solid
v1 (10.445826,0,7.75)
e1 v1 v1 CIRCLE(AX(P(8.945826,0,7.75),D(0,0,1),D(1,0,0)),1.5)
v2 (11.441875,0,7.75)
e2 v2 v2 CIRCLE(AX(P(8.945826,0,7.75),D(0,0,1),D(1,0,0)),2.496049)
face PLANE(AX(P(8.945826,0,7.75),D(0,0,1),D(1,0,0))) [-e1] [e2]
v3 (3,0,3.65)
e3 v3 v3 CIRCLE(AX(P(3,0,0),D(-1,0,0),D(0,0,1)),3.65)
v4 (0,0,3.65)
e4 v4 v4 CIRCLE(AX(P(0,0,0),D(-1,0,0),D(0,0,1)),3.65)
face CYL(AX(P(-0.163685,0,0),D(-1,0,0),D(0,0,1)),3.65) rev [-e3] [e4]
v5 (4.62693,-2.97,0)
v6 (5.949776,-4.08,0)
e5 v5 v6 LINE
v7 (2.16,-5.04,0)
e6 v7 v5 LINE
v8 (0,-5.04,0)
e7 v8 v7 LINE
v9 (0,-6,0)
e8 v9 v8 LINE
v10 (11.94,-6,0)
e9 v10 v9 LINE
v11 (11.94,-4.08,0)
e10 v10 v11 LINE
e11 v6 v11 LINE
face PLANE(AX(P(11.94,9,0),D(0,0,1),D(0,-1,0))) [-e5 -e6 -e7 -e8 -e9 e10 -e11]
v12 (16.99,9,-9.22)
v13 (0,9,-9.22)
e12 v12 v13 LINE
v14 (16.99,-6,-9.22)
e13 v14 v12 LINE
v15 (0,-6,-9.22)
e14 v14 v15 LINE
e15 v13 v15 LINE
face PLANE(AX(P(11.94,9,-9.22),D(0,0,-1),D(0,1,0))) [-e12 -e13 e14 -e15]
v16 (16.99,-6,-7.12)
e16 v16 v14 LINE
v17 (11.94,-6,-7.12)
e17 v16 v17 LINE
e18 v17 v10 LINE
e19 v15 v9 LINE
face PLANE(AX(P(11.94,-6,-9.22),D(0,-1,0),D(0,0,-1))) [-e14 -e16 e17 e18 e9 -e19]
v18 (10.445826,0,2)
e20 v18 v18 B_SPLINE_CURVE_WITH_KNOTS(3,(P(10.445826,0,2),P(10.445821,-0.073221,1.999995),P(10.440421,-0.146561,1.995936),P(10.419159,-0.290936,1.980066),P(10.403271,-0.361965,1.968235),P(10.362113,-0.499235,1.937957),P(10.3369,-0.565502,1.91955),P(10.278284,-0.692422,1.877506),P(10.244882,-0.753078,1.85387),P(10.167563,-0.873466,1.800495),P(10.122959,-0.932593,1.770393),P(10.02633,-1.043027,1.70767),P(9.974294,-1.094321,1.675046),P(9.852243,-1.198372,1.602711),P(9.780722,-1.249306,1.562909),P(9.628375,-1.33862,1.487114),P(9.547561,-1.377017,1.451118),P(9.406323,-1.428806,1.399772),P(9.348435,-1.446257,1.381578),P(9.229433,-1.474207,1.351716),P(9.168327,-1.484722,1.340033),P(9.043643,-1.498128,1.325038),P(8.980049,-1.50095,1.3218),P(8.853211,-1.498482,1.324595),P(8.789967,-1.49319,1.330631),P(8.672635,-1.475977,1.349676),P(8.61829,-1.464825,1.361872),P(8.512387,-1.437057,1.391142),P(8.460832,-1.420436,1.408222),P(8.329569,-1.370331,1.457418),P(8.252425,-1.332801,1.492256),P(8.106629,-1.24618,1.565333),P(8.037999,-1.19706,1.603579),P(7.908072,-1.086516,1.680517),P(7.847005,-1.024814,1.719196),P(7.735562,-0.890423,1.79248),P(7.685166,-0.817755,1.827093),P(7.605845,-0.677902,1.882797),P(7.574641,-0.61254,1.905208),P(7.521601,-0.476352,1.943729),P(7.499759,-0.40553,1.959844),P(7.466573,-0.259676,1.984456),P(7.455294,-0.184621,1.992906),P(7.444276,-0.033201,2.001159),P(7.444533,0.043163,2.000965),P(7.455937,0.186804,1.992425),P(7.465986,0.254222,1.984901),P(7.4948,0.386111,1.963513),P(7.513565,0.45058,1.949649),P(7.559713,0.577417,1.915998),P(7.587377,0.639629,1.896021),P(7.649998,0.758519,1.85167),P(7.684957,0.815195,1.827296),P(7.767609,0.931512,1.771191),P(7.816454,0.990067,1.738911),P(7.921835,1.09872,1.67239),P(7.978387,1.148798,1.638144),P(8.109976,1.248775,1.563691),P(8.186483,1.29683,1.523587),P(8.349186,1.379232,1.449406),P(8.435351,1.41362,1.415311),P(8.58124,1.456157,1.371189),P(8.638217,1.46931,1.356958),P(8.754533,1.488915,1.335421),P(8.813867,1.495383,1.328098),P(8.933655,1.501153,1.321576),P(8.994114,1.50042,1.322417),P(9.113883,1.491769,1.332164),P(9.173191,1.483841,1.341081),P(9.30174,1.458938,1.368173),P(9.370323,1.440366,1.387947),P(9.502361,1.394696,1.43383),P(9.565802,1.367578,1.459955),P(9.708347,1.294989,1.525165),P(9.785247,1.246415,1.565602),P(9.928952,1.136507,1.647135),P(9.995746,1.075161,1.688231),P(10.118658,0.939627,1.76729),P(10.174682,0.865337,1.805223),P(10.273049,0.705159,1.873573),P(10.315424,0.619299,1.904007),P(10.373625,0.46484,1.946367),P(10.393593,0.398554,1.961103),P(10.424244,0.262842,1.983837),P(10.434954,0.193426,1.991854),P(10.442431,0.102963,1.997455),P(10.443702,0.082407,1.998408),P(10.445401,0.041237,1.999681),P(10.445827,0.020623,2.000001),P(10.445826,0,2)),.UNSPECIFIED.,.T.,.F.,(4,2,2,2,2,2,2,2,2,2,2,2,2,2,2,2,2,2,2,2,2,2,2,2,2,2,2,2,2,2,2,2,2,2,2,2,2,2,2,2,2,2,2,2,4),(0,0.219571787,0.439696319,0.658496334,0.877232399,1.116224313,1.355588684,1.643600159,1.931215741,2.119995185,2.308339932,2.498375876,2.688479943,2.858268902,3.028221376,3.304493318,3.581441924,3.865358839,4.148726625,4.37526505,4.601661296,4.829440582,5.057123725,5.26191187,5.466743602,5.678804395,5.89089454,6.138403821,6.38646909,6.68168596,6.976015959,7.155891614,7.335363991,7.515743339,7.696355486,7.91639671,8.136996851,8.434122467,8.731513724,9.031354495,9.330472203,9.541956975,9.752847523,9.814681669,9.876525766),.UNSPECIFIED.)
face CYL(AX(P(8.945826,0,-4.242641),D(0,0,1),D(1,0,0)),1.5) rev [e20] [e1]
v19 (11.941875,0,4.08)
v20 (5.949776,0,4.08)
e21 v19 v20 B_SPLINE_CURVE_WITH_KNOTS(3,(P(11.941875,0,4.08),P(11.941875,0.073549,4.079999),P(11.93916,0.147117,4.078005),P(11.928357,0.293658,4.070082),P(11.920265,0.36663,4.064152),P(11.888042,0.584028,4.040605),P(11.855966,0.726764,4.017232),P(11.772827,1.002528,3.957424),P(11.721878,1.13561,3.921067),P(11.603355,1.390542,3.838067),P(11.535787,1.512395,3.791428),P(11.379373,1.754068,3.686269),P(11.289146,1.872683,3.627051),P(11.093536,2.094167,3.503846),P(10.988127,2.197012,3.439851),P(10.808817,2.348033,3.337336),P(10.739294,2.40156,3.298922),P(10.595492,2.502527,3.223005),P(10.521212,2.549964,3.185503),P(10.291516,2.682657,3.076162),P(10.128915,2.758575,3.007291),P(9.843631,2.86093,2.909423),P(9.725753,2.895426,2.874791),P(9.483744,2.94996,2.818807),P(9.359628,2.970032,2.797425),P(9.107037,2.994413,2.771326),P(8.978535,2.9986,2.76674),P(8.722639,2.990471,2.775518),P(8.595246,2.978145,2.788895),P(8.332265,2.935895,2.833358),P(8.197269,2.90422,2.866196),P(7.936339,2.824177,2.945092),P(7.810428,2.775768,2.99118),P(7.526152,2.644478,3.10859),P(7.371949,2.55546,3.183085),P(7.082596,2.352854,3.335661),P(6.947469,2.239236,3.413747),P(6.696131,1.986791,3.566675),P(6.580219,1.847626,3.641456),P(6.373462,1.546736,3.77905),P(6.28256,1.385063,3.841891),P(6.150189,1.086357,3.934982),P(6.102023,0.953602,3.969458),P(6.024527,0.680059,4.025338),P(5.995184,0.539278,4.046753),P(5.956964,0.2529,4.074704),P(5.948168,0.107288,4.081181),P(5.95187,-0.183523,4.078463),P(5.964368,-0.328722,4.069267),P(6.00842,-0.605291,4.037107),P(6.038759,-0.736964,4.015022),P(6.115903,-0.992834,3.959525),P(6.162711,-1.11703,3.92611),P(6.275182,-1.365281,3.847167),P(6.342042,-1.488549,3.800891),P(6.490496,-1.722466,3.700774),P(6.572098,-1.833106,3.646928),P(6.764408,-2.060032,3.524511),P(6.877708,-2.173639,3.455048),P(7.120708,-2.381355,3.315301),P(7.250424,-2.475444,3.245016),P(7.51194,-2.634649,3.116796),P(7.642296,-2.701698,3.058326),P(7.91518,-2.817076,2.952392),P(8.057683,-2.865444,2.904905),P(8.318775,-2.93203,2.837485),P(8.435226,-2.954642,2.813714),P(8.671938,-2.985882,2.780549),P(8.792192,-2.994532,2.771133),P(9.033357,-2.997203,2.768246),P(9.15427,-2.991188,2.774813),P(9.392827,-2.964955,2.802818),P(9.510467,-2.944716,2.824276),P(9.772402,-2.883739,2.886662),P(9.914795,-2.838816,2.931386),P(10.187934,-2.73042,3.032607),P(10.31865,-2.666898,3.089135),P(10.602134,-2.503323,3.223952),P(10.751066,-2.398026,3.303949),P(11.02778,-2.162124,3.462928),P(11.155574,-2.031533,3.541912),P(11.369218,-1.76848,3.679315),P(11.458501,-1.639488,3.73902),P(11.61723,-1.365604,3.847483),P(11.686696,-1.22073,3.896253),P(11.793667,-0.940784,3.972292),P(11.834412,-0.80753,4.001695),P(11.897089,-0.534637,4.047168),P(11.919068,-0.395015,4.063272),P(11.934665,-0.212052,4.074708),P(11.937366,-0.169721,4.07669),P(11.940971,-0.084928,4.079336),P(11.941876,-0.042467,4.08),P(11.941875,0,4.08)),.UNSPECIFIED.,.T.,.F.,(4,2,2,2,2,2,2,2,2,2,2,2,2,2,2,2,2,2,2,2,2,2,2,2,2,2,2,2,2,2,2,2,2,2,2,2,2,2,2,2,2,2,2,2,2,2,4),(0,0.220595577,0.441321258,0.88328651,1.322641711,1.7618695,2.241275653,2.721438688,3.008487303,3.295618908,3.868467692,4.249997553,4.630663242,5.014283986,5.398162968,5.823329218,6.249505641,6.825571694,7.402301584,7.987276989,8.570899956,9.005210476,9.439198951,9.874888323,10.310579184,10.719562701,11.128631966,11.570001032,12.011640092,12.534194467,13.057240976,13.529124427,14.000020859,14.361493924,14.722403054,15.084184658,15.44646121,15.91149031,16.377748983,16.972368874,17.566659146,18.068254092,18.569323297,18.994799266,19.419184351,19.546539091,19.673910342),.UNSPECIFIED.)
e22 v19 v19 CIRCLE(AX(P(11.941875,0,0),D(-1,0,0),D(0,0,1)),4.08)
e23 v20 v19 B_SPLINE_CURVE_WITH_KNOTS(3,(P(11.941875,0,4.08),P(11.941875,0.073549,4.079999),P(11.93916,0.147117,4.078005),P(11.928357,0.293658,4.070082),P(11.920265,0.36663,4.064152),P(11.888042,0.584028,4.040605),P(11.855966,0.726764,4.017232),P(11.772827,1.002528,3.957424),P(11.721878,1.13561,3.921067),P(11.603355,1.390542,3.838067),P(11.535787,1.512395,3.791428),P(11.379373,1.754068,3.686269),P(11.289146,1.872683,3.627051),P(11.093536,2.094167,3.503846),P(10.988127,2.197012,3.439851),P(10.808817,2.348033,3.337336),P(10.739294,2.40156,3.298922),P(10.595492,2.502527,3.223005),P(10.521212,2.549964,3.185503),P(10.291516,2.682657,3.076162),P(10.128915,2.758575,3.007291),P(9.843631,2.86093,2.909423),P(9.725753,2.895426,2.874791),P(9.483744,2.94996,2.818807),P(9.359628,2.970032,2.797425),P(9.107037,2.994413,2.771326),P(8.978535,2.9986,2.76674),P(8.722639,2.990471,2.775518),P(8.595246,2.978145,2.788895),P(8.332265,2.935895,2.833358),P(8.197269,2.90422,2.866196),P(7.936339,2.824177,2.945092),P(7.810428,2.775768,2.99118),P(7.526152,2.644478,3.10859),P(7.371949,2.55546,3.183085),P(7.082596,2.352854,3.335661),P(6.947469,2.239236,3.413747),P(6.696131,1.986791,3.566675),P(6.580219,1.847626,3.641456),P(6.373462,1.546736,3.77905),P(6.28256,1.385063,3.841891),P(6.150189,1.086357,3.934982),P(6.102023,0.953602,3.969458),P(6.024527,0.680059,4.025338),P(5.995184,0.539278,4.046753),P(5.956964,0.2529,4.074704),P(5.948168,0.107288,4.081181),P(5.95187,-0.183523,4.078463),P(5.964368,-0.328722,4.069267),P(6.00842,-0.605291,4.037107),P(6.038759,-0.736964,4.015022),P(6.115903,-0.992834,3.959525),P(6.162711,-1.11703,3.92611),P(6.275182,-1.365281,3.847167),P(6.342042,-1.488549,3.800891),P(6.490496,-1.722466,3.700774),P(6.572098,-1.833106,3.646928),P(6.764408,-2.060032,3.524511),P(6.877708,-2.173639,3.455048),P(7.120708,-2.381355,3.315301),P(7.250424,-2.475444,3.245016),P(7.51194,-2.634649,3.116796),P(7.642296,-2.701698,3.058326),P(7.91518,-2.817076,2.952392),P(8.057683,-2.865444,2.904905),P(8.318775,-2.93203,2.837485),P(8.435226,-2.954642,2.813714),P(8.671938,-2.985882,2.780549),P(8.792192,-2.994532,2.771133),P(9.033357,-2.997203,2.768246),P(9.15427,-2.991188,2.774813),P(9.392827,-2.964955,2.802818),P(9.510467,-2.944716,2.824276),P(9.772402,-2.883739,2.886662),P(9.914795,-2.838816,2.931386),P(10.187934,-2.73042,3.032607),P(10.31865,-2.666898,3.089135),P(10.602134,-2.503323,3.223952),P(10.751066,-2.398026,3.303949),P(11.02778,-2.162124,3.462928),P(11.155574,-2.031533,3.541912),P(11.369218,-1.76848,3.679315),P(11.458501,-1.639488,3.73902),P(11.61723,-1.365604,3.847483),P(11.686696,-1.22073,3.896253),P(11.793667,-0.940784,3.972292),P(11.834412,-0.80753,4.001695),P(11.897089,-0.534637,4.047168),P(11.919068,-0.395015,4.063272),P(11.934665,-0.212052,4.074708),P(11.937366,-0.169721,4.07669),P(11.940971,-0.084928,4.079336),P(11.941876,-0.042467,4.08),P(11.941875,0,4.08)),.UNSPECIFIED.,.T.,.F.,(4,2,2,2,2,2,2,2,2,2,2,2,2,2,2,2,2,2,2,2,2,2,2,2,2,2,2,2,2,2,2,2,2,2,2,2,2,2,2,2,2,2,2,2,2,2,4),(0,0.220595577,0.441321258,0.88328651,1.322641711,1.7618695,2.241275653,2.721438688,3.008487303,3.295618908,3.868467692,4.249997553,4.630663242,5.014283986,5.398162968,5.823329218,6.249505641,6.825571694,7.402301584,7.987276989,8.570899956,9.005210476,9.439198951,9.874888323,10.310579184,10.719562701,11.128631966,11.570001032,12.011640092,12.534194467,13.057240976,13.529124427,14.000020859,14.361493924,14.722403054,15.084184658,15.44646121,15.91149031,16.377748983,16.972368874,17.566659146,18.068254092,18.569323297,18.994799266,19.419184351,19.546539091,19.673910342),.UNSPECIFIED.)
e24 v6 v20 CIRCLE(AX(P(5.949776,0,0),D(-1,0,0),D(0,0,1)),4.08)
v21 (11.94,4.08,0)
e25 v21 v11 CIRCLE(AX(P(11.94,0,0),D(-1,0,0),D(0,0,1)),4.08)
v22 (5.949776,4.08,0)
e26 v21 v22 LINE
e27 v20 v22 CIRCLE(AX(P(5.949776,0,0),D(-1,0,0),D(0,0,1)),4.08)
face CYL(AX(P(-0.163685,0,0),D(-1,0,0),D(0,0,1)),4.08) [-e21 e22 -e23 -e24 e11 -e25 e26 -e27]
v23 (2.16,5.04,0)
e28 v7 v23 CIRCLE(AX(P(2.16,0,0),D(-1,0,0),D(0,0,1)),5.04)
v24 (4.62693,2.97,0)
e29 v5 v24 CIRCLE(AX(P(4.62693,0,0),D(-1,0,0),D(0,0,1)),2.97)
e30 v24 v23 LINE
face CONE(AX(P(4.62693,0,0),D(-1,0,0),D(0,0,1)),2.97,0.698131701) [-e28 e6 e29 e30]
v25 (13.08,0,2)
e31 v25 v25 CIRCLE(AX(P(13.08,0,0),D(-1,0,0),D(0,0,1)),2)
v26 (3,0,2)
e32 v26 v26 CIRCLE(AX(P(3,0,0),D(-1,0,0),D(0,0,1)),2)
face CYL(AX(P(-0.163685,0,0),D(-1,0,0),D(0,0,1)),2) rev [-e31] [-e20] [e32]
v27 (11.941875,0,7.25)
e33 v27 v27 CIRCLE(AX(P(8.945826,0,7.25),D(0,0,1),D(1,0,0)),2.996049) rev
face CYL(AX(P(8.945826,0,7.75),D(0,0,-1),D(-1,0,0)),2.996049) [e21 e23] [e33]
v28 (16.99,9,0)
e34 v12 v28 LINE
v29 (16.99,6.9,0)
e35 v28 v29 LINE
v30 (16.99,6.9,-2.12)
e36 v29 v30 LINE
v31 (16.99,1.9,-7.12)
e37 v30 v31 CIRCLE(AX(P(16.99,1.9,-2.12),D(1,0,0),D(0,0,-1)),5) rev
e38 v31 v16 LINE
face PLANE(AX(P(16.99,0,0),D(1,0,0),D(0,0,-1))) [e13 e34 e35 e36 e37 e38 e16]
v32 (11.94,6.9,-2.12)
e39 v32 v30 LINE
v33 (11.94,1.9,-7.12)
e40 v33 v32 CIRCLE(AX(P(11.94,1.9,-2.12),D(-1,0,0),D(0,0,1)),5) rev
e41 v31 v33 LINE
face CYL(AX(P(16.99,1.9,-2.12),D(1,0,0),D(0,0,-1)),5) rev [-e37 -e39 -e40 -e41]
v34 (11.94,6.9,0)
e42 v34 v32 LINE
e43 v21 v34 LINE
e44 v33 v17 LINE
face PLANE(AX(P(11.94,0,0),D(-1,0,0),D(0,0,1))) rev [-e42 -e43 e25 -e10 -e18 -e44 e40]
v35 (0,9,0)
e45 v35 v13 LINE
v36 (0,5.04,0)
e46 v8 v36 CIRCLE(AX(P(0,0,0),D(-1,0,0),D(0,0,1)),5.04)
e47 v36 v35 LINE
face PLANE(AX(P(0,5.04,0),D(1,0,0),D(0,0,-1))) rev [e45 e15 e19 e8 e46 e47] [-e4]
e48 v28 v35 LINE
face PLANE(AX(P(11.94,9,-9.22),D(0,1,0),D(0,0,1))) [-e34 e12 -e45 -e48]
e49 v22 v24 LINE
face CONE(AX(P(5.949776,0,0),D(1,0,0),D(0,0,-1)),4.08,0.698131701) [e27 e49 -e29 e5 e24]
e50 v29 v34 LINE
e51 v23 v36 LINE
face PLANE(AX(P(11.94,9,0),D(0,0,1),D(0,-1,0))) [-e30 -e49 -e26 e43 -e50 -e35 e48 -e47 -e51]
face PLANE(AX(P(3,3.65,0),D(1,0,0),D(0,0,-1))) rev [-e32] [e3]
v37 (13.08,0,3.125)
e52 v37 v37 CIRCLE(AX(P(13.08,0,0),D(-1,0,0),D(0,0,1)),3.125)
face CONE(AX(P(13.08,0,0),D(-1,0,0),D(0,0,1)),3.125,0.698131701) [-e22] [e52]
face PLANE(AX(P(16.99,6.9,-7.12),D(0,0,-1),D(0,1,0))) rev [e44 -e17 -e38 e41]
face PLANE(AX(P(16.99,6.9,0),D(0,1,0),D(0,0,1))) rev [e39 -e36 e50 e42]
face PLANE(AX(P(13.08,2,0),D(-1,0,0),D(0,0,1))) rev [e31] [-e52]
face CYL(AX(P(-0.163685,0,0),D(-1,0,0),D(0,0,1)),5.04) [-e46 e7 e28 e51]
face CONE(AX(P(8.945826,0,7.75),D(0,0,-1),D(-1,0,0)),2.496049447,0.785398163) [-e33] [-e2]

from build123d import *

# Parameters (mm, degrees)
SKETCH2_R           = 2.996049
BOSS_EXTRUDE1_DEPTH = 7.75
SKETCH3_W           = 9.22
SKETCH3_H           = 15
BOSS_EXTRUDE2_DEPTH = 11.94
BOSS_EXTRUDE3_DEPTH = 5.05
FILLET1_START       = 11.94
FILLET1_DEPTH       = 5.05
SKETCH5_R           = 1.5
CUT_EXTRUDE1_DEPTH  = 7.75
SKETCH6_R           = 2
CUT_EXTRUDE2_DEPTH  = 13.08
CUT_EXTRUDE3_START  = -3
SKETCH7_R           = 3.65
CUT_EXTRUDE3_DEPTH  = 3


with BuildPart() as part:
    # Sketch1 → Revolve1 (revolve)
    with BuildSketch(Plane.XY, mode=Mode.PRIVATE) as revolve1_sk:
        Polygon((0, 3.65), (3, 3.65), (3, 2), (13.08, 2), (13.08, 3.125), (11.941875, 4.08), (5.949776, 4.08), (4.62693, 2.97), (2.16, 5.04), (0, 5.04), align=None)
    revolve(revolve1_sk.sketch.rotate(Axis((-0.163685, 0, 0), (1, 0, 0)), 90), axis=Axis((-0.163685, 0, 0), (1, 0, 0)))

    # Sketch2 → Boss-Extrude1 (add)
    with BuildSketch(Plane.XY):
        with Locations((8.945826, 0)):
            Circle(SKETCH2_R)
    extrude(amount=BOSS_EXTRUDE1_DEPTH)

    # Sketch3 → Boss-Extrude2 (add)
    with BuildSketch(Plane.ZY):
        with Locations((-4.61, 1.5)):
            Rectangle(SKETCH3_W, SKETCH3_H)
    extrude(amount=-BOSS_EXTRUDE2_DEPTH)

    # Sketch4 → Boss-Extrude3 (add)
    with BuildSketch(Plane(origin=(11.94, 0, 0), x_dir=(0, 0, -1), z_dir=(1, 0, 0))):
        Polygon((0, 9), (9.22, 9), (9.22, -6), (7.12, -6), (7.12, 6.9), (0, 6.9), align=None)
    extrude(amount=BOSS_EXTRUDE3_DEPTH)

    # Fillet1: read off the stored shape, not the designer's step
    # Fillet1 outline → Fillet1 (add)
    with BuildSketch(Plane.YZ.offset(FILLET1_START)):
        with BuildLine():
            ThreePointArc((6.9, -2.12), (5.435534, -5.655534), (1.9, -7.12))
            Line((1.9, -7.12), (6.9, -7.12))
            Line((6.9, -7.12), (6.9, -2.12))
        make_face()
    extrude(amount=FILLET1_DEPTH)

    # Chamfer1: read off the stored shape, not the designer's step
    # Chamfer1 outline → Chamfer1 (revolve, cut)
    with BuildSketch(Plane(origin=(8.945826, 0, 0), x_dir=(1, 0, 0), z_dir=(0, -1, 0))):
        Polygon((2.996049, 7.75), (2.496049, 7.75), (2.996049, 7.25), align=None)
    revolve(axis=Axis((8.945826, 0, 0), (0, 0, 1)), mode=Mode.SUBTRACT)

    # Sketch5 → Cut-Extrude1 (cut)
    with BuildSketch(Plane.XY.offset(7.75)):
        with Locations((8.945826, 0)):
            Circle(SKETCH5_R)
    extrude(amount=-CUT_EXTRUDE1_DEPTH, mode=Mode.SUBTRACT)

    # Sketch6 → Cut-Extrude2 (cut)
    with BuildSketch(Plane(origin=(13.08, 0, 0), x_dir=(0, 0, -1), z_dir=(1, 0, 0))):
        with Locations(Location((0, 0, 0), (0, 0, 180))):
            Circle(SKETCH6_R)
    extrude(amount=-CUT_EXTRUDE2_DEPTH, mode=Mode.SUBTRACT)

    # Sketch7 → Cut-Extrude3 (cut)
    with BuildSketch(Plane.ZY.offset(CUT_EXTRUDE3_START)):
        Circle(SKETCH7_R)
    extrude(amount=CUT_EXTRUDE3_DEPTH, mode=Mode.SUBTRACT)


solid = part.part
